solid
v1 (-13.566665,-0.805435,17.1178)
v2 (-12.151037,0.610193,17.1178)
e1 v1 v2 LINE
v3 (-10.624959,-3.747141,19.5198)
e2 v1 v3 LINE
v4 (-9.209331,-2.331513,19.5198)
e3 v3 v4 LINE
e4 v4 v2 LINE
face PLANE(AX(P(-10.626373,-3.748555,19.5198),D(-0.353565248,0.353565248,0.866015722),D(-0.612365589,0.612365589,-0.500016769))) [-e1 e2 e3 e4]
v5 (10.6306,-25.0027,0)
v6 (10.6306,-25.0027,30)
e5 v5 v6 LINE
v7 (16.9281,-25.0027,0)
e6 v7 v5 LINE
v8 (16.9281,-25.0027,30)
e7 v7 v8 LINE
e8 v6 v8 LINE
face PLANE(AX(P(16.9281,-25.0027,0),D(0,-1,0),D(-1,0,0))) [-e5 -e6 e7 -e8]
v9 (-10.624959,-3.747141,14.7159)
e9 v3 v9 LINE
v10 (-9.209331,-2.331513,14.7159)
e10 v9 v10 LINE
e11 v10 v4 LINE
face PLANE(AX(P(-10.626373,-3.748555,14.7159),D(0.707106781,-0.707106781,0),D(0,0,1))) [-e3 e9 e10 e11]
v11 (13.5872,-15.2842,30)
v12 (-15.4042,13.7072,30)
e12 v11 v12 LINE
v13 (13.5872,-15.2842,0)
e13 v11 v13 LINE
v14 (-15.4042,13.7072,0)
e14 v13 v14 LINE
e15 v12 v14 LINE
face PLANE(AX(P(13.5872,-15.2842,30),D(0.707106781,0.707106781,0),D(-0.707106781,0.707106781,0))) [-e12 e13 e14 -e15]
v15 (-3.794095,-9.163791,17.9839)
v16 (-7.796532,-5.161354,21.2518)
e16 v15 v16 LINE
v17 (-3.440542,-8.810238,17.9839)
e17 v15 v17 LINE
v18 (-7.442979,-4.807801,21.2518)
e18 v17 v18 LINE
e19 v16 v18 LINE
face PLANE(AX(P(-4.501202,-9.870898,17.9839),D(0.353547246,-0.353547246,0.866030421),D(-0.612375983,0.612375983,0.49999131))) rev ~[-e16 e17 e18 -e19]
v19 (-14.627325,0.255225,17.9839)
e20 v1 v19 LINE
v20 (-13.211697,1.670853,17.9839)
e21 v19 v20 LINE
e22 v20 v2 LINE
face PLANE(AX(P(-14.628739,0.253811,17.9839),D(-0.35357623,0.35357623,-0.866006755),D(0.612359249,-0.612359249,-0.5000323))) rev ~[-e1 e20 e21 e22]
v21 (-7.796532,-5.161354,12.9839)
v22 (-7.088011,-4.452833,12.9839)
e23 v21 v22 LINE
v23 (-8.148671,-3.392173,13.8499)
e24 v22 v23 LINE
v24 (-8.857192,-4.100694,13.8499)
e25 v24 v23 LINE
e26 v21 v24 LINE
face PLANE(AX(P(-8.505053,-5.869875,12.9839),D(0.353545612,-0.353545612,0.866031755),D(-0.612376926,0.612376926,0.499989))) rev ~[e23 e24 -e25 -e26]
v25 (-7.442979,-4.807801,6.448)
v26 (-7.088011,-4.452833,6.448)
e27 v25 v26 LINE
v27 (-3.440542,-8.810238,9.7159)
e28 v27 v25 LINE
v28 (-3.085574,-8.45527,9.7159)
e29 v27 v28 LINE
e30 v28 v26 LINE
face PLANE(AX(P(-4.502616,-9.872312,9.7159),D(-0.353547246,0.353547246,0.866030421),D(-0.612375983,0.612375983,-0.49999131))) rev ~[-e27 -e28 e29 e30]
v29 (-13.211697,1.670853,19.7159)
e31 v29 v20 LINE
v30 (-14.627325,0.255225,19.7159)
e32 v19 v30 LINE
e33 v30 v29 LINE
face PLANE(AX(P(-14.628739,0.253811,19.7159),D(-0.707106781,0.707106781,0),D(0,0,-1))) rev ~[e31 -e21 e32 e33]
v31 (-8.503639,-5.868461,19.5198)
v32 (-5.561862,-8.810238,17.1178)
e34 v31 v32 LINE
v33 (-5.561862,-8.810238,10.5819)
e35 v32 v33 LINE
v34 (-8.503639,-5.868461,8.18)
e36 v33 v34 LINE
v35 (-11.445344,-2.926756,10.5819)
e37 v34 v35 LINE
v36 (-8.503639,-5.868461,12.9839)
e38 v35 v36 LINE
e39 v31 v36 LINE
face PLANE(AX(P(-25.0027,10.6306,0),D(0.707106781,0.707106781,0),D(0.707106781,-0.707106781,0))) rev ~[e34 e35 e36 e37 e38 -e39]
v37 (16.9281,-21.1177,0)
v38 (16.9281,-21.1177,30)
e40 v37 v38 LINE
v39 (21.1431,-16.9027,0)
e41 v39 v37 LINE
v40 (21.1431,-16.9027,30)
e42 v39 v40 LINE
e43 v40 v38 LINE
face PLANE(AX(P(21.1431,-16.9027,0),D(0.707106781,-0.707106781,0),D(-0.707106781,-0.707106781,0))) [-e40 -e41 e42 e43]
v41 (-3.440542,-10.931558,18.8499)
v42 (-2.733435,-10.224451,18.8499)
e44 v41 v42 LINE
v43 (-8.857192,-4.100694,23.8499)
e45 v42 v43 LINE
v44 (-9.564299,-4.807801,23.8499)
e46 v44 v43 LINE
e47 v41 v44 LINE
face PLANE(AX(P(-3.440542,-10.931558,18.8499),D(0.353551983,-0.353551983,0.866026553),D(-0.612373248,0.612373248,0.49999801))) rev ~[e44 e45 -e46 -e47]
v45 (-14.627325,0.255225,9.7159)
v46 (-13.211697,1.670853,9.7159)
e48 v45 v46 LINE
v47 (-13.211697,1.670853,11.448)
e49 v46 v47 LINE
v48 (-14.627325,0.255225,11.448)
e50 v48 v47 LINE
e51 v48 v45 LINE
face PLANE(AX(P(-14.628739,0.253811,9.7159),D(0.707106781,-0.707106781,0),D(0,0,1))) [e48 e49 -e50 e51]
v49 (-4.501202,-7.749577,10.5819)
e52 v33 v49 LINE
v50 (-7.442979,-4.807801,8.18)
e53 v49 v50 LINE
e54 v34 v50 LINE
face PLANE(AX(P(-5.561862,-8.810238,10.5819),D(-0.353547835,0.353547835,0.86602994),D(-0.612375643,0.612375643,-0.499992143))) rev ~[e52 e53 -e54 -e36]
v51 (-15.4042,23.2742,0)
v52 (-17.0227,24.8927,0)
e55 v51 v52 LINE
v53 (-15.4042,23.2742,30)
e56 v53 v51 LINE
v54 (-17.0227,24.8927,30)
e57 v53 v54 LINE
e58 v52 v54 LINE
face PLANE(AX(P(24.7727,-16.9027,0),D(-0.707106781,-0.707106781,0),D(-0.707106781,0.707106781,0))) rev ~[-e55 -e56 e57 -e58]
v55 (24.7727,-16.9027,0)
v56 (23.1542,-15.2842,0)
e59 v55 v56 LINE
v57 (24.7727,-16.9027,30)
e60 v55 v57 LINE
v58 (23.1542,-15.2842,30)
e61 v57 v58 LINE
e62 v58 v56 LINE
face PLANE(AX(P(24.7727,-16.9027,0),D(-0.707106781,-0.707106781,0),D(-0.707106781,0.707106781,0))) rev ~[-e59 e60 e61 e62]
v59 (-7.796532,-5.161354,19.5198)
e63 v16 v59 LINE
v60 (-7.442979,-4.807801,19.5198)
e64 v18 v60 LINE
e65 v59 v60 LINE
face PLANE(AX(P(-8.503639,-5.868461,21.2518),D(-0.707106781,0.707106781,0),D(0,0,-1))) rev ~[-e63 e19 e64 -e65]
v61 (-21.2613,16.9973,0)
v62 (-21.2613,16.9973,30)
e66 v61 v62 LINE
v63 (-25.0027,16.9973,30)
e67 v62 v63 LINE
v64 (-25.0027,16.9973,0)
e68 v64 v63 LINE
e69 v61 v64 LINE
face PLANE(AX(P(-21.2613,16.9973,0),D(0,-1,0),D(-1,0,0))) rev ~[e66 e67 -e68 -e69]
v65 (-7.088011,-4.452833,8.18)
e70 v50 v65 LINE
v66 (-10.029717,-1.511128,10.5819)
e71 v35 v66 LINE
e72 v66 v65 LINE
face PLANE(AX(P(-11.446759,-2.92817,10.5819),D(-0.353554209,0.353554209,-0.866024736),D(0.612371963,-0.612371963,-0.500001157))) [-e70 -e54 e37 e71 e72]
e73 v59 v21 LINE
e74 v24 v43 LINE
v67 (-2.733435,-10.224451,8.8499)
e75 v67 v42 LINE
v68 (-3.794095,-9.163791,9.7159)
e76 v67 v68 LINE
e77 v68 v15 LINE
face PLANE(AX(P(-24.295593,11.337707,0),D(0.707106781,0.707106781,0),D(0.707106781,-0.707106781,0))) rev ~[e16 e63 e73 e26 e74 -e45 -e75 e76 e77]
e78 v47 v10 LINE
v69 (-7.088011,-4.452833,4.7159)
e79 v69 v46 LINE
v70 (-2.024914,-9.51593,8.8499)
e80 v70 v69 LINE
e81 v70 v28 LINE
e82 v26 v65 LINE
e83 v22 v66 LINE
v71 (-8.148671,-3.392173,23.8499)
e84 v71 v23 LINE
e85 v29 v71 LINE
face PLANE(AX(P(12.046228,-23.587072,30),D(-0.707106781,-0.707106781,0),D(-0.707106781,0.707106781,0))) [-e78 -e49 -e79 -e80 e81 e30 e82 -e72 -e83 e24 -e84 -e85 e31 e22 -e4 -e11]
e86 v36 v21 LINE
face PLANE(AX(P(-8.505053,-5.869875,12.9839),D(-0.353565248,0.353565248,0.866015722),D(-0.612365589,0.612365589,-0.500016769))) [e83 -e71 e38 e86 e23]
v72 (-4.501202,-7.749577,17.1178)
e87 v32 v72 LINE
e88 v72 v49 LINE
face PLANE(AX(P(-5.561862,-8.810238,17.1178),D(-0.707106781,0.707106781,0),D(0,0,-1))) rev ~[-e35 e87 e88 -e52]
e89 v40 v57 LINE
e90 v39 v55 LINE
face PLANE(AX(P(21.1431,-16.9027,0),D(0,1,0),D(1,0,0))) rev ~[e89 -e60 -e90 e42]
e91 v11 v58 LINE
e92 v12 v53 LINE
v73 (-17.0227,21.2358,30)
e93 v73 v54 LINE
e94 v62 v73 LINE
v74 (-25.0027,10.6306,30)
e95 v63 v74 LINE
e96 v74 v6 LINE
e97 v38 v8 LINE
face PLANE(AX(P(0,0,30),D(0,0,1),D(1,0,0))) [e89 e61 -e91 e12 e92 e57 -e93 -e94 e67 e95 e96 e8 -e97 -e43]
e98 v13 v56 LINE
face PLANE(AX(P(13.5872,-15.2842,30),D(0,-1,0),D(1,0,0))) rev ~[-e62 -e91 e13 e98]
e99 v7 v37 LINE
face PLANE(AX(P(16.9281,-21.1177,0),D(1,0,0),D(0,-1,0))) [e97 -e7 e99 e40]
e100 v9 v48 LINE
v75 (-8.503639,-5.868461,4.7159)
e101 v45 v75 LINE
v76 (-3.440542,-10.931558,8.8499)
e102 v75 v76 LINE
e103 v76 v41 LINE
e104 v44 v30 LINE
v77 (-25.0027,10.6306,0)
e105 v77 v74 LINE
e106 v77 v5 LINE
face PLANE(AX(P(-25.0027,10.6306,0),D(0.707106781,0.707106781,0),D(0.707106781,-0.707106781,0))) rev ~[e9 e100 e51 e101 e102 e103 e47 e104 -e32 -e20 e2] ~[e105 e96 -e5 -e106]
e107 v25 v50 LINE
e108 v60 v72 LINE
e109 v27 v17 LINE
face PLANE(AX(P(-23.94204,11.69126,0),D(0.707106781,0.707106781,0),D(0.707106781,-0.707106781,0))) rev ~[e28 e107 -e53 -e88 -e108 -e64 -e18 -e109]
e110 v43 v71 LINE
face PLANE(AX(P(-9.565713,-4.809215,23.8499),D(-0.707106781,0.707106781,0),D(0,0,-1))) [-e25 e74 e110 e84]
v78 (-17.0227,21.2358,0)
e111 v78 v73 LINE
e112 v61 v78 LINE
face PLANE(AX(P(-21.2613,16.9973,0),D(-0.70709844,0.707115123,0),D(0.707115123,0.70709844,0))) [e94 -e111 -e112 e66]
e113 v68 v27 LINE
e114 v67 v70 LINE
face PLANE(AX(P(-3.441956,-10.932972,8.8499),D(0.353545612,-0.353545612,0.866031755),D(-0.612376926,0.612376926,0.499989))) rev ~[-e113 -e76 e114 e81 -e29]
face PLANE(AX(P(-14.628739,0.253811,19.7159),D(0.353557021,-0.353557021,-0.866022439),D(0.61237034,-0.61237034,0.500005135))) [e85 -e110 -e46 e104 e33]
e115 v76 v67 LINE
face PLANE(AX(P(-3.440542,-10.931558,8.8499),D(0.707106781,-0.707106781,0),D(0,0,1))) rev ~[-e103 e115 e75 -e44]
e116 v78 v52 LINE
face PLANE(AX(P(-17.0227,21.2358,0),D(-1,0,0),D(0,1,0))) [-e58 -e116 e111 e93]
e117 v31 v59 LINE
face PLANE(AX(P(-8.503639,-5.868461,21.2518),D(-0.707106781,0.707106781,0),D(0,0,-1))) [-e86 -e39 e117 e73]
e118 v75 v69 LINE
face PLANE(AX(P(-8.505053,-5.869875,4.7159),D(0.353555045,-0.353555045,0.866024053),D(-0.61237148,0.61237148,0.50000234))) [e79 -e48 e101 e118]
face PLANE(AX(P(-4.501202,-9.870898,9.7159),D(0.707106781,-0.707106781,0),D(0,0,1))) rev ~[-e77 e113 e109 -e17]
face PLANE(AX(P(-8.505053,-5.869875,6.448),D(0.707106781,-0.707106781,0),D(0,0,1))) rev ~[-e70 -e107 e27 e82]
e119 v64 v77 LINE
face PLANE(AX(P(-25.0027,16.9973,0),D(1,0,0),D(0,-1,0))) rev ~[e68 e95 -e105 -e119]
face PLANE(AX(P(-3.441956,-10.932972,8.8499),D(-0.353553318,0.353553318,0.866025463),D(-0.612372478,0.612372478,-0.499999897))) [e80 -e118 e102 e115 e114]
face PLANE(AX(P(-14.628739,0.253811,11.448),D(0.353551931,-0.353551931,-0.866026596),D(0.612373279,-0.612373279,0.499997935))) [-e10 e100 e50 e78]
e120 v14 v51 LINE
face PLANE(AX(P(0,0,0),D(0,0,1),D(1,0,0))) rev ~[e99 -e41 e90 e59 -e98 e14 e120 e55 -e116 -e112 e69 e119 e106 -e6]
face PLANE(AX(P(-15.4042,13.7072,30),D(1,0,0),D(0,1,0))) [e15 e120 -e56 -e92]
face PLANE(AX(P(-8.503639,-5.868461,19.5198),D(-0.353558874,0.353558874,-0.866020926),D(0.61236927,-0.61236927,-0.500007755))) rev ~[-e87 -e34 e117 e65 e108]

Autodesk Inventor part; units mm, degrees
ref_plane "YZ Plane" through (0, 0, 0) normal (1, 0, 0) x (0, 1, 0)
ref_plane "XZ Plane" through (0, 0, 0) normal (0, 1, 0) x (-1, 0, 0)
sketch "Sketch1" plane through (0, 0, 0) normal (0, 0, 1) x (1, 0, 0)
  line L0 (21.1431, -16.9027) -> (16.9281, -21.1177)
  line L1 (-21.2613, 16.9973) -> (-17.0227, 21.2358)
  line L2 (-17.0227, 21.2358) -> (16.9281, -21.1177) construction
  line L3 (21.1431, -16.9027) -> (-21.2613, 16.9973) construction
  line L4 (-17.0227, 21.2358) -> (36.8231, 21.2358) construction
  line L5 (16.9281, -21.1177) -> (16.9281, -25.0027)
  line L6 (-17.0227, 21.2358) -> (-17.0227, 24.8927)
  line L7 (21.1431, -16.9027) -> (24.7727, -16.9027)
  line L8 (24.7727, -16.9027) -> (-17.0227, 24.8927)
  line L9 (-25.0027, 16.9973) -> (-25.0027, 10.6306)
  line L10 (16.9281, -25.0027) -> (10.6306, -25.0027)
  line L11 (-25.0027, 10.6306) -> (10.6306, -25.0027)
  line L12 (-25.0027, 16.9973) -> (-7.0741, 16.9973) construction
  line L13 (-17.1227, 21.2773) -> (-21.3027, 17.0973)
  line L14 (16.8927, -21.1827) -> (21.0727, -17.0027)
  line L15 (24.7727, -17.0027) -> (21.1414, -17.0027)
  line L16 (22.7727, -25.0027) -> (-23.0273, -25.0027)
  line L17 (16.8927, -25.0027) -> (16.8927, -21.2526)
  line L18 (-17.1227, 25.0973) -> (-17.1227, 21.3471)
  line L19 (-25.0027, 17.0973) -> (-21.3714, 17.0973)
  line L20 (-21.2613, 16.9973) -> (-25.0027, 16.9973)
  point P0 (0, 0)
  point P1 (16.8927, -21.2526)
extrude "Extrusion1" add sketch "Sketch1" along normal blind 30
ref_plane "Work Plane1" through (16.9, -16.9, -8) normal (-0.7071068, -0.7071068, 0) x (0, 0, 1)
sketch "Sketch7" plane through (0, 0, 30) normal (0, 0, 1) x (1, 0, 0)
  line L0 (21.1431, -16.9027) -> (24.7727, -16.9027) projected
  line L1 (24.7727, -16.9027) -> (-17.0227, 24.8927) projected
  line L2 (-17.0227, 24.8927) -> (-17.0227, 21.2358) projected
  line L3 (-17.0227, 21.2358) -> (-21.2613, 16.9973) projected
  line L4 (-21.2613, 16.9973) -> (-25.0027, 16.9973) projected
  line L5 (-25.0027, 16.9973) -> (-25.0027, 10.6306) projected
  line L6 (-25.0027, 10.6306) -> (10.6306, -25.0027) projected
  line L7 (10.6306, -25.0027) -> (16.9281, -25.0027) projected
  line L8 (16.9281, -25.0027) -> (16.9281, -21.1177) projected
  line L9 (16.9281, -21.1177) -> (21.1431, -16.9027) projected
  line L10 (3.875, 3.995) -> (-7.1861, -7.1861)
  line L11 (-25.0027, 10.6306) -> (10.6306, -25.0027) projected
  line L12 (23.1542, -5.7172) -> (13.5872, -15.2842)
  line L13 (13.5872, -15.2842) -> (-15.4042, 13.7072)
  line L14 (-15.4042, 13.7072) -> (-5.8372, 23.2742)
  line L15 (-5.8372, 23.2742) -> (23.1542, -5.7172)
  line L16 (23.1542, -5.7172) -> (-15.4042, 13.7072) construction
  line L17 (13.5872, -15.2842) -> (-5.8372, 23.2742) construction
  line L18 (-15.4042, 13.7072) -> (-15.4042, 23.2742)
  line L19 (24.7727, -16.9027) -> (-17.0227, 24.8927) projected
  line L20 (13.5872, -15.2842) -> (23.1542, -15.2842)
  point P0 (0, 0)
  dimension "d28" = 41
  dimension "d29" = 1.2
  dimension "d74" = 0
extrude "Extrusion7" cut sketch "Sketch7" against normal through all contours L20 L12 L1 | L12 L13 L10 L1 | L1 L14 L15 L12 | L10 L13 L14 L1 | L14 L18 L1
sketch "Sketch10" plane through (10.6306, -25.0027, 30) normal (-0.7071068, -0.7071068, 0) x (-0.7071068, 0.7071068, 0)
  line L0 (1.6838, 16.5215) -> (7.0744, 19.4702) construction
  line L1 (7.0744, 19.4702) -> (7.0744, 10.5304) construction
  line L2 (7.0744, 10.5304) -> (1.6838, 10.5304) construction
  line L3 (1.6838, 10.5304) -> (1.6838, 6.839) construction
  line L4 (1.6838, 6.839) -> (6.7206, 6.839) construction
  line L5 (6.7206, 6.839) -> (6.7206, 1.2092) construction
  line L6 (6.7206, 1.2092) -> (1.6838, 1.2092) construction
  line L7 (1.6838, 1.2092) -> (1.6838, -3.423) construction
  line L8 (1.6838, -3.423) -> (55.1934, -3.423) construction
  line L9 (1.6838, 30.377) -> (1.6838, 26.2152) construction
  line L10 (1.6838, 26.2152) -> (7.1181, 26.2152) construction
  line L11 (7.1181, 26.2152) -> (7.1181, 20.0634) construction
  line L12 (7.1181, 20.0634) -> (1.6838, 20.0634) construction
  line L13 (1.6838, 20.0634) -> (1.6838, 16.5215) construction
  line L14 (7.0744, 15.0003) -> (55.1934, 14.9149) construction
  line L15 (1.6838, 30.377) -> (36.6838, 30.377) construction
  line L16 (36.6838, -3.423) -> (1.6838, -3.423) construction
  line L17 (19.8996, 21.1501) -> (19.8996, 11.1501)
  line L18 (19.8996, 11.1501) -> (28.5599, 6.1501)
  line L19 (19.8996, 21.1501) -> (21.3996, 20.2841)
  line L20 (21.3996, 20.2841) -> (21.3996, 12.0161)
  line L21 (21.3996, 12.0161) -> (27.0599, 8.7482)
  line L22 (27.0599, 8.7482) -> (27.0599, 17.0161)
  line L23 (27.0599, 17.0161) -> (28.5599, 16.1501)
  line L24 (28.5599, 16.1501) -> (28.5599, 6.1501)
  line L25 (50.3931, 0) -> (0, 0) construction
  line L26 (50.3931, 30) -> (50.3931, 0) construction
  line L27 (50.3931, 15) -> (0, 15) construction
  line L28 (0, 30) -> (0, 0) construction
  point P0 (25.1966, 30)
  point P1 (25.1966, 15)
  dimension "d40" = 1.5
  dimension "d41" = 1.5
  dimension "d42" = 1.5
  dimension "d43" = 10
  dimension "d44" = 10
  dimension "d75" = 8.268
  dimension "d76" = 120
emboss "Emboss1" sketch "Sketch10" operation cut depth 1 direction (0.7071068, 0.7071068, 0)
sketch "Sketch11" plane through (10.6306, -25.0027, 30) normal (-0.7071068, -0.7071068, 0) x (-0.7071068, 0.7071068, 0)
  line L0 (21.3996, 12.0161) -> (27.0599, 8.7482) construction
  line L1 (27.0599, 8.7482) -> (27.0599, 17.0161) construction
  line L2 (27.0599, 17.0161) -> (28.5599, 16.1501) construction
  line L3 (28.5599, 16.1501) -> (28.5599, 6.1501) construction
  line L4 (28.5599, 6.1501) -> (19.8996, 11.1501) construction
  line L5 (19.8996, 11.1501) -> (19.8996, 21.1501) construction
  line L6 (19.8996, 21.1501) -> (21.3996, 20.2841) construction
  line L7 (21.3996, 20.2841) -> (21.3996, 12.0161) construction
  line L8 (50.3931, 30) -> (0, 30) construction
  line L9 (0, 30) -> (0, 0) construction
  line L10 (50.3931, 0) -> (0, 0) construction
  line L11 (50.3931, 30) -> (50.3931, 0) construction
  line L12 (9.2379, 27.3057) -> (21.3996, 20.2841) construction
  line L13 (21.3996, 20.2841) -> (21.3996, 12.0161) construction
  line L14 (21.3996, 12.0161) -> (27.0599, 8.7482) construction
  line L15 (27.0599, 8.7482) -> (27.0599, 7.4216) construction
  line L16 (27.0599, 7.4216) -> (17.8982, 13.0177) construction
  line L17 (17.8982, 13.0177) -> (17.8982, 3.0177) construction
  line L18 (17.8982, 3.0177) -> (9.2379, 8.0177) construction
  line L19 (9.2379, 8.0177) -> (9.2379, 27.3057) construction
  line L20 (15.5651, 18.4016) -> (15.5, -16.9) construction
  line L21 (15.5651, 18.4016) -> (-17.5, 16.9) construction
  line L22 (-17.5, 16.9) -> (-17.5, 12.7382) construction
  line L23 (-17.5, 12.7382) -> (-12.0658, 12.7382) construction
  line L24 (-12.0658, 12.7382) -> (-12.0658, 6.5864) construction
  line L25 (-12.0658, 6.5864) -> (-17.5, 6.5864) construction
  line L26 (-17.5, 6.5864) -> (-17.5, 3.0446) construction
  line L27 (-17.5, 3.0446) -> (-12.1095, 3.0446) construction
  line L28 (-12.1095, 3.0446) -> (-12.1095, -2.9465) construction
  line L29 (-12.1095, -2.9465) -> (-17.5, -2.9465) construction
  line L30 (-17.5, -2.9465) -> (-17.5, -6.638) construction
  line L31 (-17.5, -6.638) -> (-12.4632, -6.638) construction
  line L32 (-12.4632, -6.638) -> (-12.4632, -12.2678) construction
  line L33 (-12.4632, -12.2678) -> (-17.5, -12.2678) construction
  line L34 (-17.5, -12.2678) -> (-17.5, -16.9) construction
  line L35 (-17.5, -16.9) -> (15.5, -16.9) construction
  line L36 (-12.1095, 0.049) -> (15.5326, 0.7508) construction
  line L37 (15.5, -16.9) -> (15.5651, 18.4016) construction
  line L38 (1.91, 17.7815) -> (1.91, -16.9) construction
  line L39 (15.5, -16.9) -> (-17.5, -16.9) construction
  line L40 (27.0599, 8.7482) -> (27.0599, 7.4216) construction
  line L41 (21.3996, 20.2841) -> (21.3996, 12.0161)
  line L42 (21.3996, 12.0161) -> (27.0599, 8.7482)
  line L43 (21.3996, 20.2841) -> (21.3996, 12.0161)
  line L44 (21.3996, 12.0161) -> (27.0599, 8.7482)
  line L45 (27.0599, 8.7482) -> (27.0599, 10.4802)
  line L46 (27.0599, 8.7482) -> (27.0599, 7.4216)
  line L47 (27.0599, 10.4802) -> (22.8996, 12.8822)
  line L48 (22.8996, 12.8822) -> (22.8996, 19.4181)
  line L49 (22.8996, 19.4181) -> (27.0599, 21.82)
  line L50 (21.3996, 20.2841) -> (27.0599, 23.552)
  line L51 (27.0599, 23.552) -> (27.0599, 21.82)
  point P0 (25.1966, 30)
  point P1 (20.9754, 14.9785)
  dimension "d47" = 120
  dimension "d48" = 1.5
  dimension "d49" = 1.5
  dimension "d50" = 1.5
  dimension "d77" = 8.268
  dimension "d78" = 4.1602
  dimension "d79" = 5.6602
  dimension "d80" = 120
  dimension "d81" = 120
emboss "Emboss2" sketch "Sketch11" operation cut depth 1.5 direction (0.7071068, 0.7071068, 0)
sketch "Sketch12" plane through (10.6306, -25.0027, 30) normal (-0.7071068, -0.7071068, 0) x (-0.7071068, 0.7071068, 0)
  line L0 (22.8996, 12.8822) -> (27.0599, 10.4802) construction
  line L1 (27.0599, 10.4802) -> (27.0599, 17.0161) construction
  line L2 (27.0599, 17.0161) -> (28.5599, 16.1501) construction
  line L3 (28.5599, 16.1501) -> (28.5599, 6.1501) construction
  line L4 (28.5599, 6.1501) -> (19.8996, 11.1501) construction
  line L5 (19.8996, 11.1501) -> (19.8996, 21.1501) construction
  line L6 (19.8996, 21.1501) -> (21.3996, 20.2841) construction
  line L7 (21.3996, 20.2841) -> (27.0599, 23.552) construction
  line L8 (27.0599, 23.552) -> (27.0599, 21.82) construction
  line L9 (27.0599, 21.82) -> (22.8996, 19.4181) construction
  line L10 (22.8996, 19.4181) -> (22.8996, 12.8822) construction
  line L11 (50.3931, 30) -> (0, 30) construction
  line L12 (0, 30) -> (0, 0) construction
  line L13 (50.3931, 0) -> (0, 0) construction
  line L14 (50.3931, 30) -> (50.3931, 0) construction
  line L15 (12.7689, 9.4432) -> (16.9291, 7.0413) construction
  line L16 (16.9291, 7.0413) -> (27.0599, 17.0161) construction
  line L17 (27.0599, 17.0161) -> (28.5599, 16.1501) construction
  line L18 (28.5599, 16.1501) -> (28.5599, 6.1501) construction
  line L19 (28.5599, 6.1501) -> (13.0911, 5.9826) construction
  line L20 (13.0911, 5.9826) -> (19.8996, 21.1501) construction
  line L21 (19.8996, 21.1501) -> (21.3996, 20.2841) construction
  line L22 (21.3996, 20.2841) -> (27.0599, 23.552) construction
  line L23 (27.0599, 23.552) -> (27.0599, 21.82) construction
  line L24 (27.0599, 21.82) -> (12.7689, 15.9791) construction
  line L25 (12.7689, 15.9791) -> (12.7689, 9.4432) construction
  line L26 (-17.5, 16.9) -> (-17.5, 12.7382) construction
  line L27 (-17.5, 12.7382) -> (-12.0658, 12.7382) construction
  line L28 (-12.0658, 12.7382) -> (-12.0658, 6.5864) construction
  line L29 (-12.0658, 6.5864) -> (-17.5, 6.5864) construction
  line L30 (-17.5, 6.5864) -> (-17.5, 3.0446) construction
  line L31 (-17.5, 3.0446) -> (-12.1095, 3.0446) construction
  line L32 (-12.1095, 3.0446) -> (-12.1095, -2.9465) construction
  line L33 (-12.1095, -2.9465) -> (-17.5, -2.9465) construction
  line L34 (-17.5, -2.9465) -> (-17.5, -6.638) construction
  line L35 (-17.5, -6.638) -> (-12.4632, -6.638) construction
  line L36 (-12.4632, -6.638) -> (-12.4632, -12.2678) construction
  line L37 (-12.4632, -12.2678) -> (-17.5, -12.2678) construction
  line L38 (-17.5, -12.2678) -> (-17.5, -16.9) construction
  line L39 (-17.5, -16.9) -> (15.5, -16.9) construction
  line L40 (21.3996, 20.2841) -> (27.0599, 23.552)
  line L41 (19.8996, 21.1501) -> (21.3996, 20.2841)
  line L42 (21.3996, 20.2841) -> (27.0599, 23.552)
  line L43 (27.0599, 23.552) -> (27.0599, 21.82)
  line L44 (27.0599, 23.552) -> (27.0599, 21.82)
  line L45 (16.9291, 7.0413) -> (27.0599, 17.0161) construction
  line L46 (19.8996, 21.1501) -> (27.0599, 25.2841)
  line L47 (27.0599, 25.2841) -> (35.7201, 20.2841)
  line L48 (35.7201, 20.2841) -> (35.7201, 18.552)
  line L49 (35.7201, 18.552) -> (30.0599, 15.2841)
  line L50 (30.0599, 15.2841) -> (30.0599, 10.4802)
  line L51 (30.0599, 10.4802) -> (34.2201, 12.8822)
  line L52 (35.7201, 10.2841) -> (35.7201, 10.2841)
  line L53 (35.7201, 10.2841) -> (28.5599, 6.1501)
  line L54 (27.0599, 17.0161) -> (28.5599, 16.1501)
  line L55 (28.5599, 6.1501) -> (28.5599, 16.1501)
  line L56 (28.5599, 16.1501) -> (27.0599, 17.0161)
  line L57 (27.0599, 21.82) -> (27.0599, 23.552)
  line L58 (28.5599, 16.1501) -> (28.5599, 6.1501)
  line L59 (27.0599, 17.0161) -> (31.2201, 19.4181)
  line L60 (31.2201, 19.4181) -> (27.0599, 21.82)
  line L61 (13.0911, 5.9826) -> (28.5599, 6.1501) construction
  line L62 (12.7689, 9.4432) -> (16.9291, 7.0413) construction
  line L63 (12.7689, 9.4432) -> (28.5599, 9.6142) construction
  line L64 (28.5599, 9.6142) -> (29.486, 10.1489) construction
  line L65 (28.5599, 16.1501) -> (35.7201, 20.2841) construction
  line L66 (28.5599, 6.1501) -> (34.2971, 9.4625) construction
  line L67 (31.2201, 19.4181) -> (35.3769, 18.7502) construction
  line L68 (27.0599, 23.552) -> (27.0599, 21.82) construction
  line L69 (35.3769, 18.7502) -> (27.0599, 23.552) construction
  line L70 (35.7201, 10.2841) -> (35.7201, 12.0161)
  line L71 (35.7201, 12.0161) -> (34.2201, 12.8822)
  line L72 (16.3223, 7.4494) -> (20.4826, 5.0475) construction
  line L73 (16.3223, 13.9853) -> (16.3223, 7.4494) construction
  line L74 (20.4826, 16.3872) -> (16.3223, 13.9853) construction
  line L75 (20.4826, 18.1193) -> (20.4826, 16.3872) construction
  line L76 (14.8223, 14.8513) -> (20.4826, 18.1193) construction
  line L77 (14.8223, 15.7065) -> (14.8223, 14.8513) construction
  line L78 (20.4826, 12.5307) -> (14.8223, 15.7065) construction
  line L79 (20.4826, 5.0475) -> (20.4826, 12.5307) construction
  line L80 (20.4826, 12.5307) -> (28.5599, 7.9987) construction
  line L81 (28.5599, 7.9987) -> (33.93, 11.0117) construction
  point P0 (25.1966, 30)
  point P1 (20.9754, 14.9785)
  dimension "d54" = 60
  dimension "d55" = 1.5
  dimension "d57" = 120
  dimension "d58" = 1.5
  dimension "d59" = 120
  dimension "d82" = 3
  dimension "d83" = 3
  dimension "d84" = 3
  dimension "d85" = 1.5
  dimension "d86" = 7.1602
  dimension "d87" = 7.1602
  dimension "d88" = 4.1602
  dimension "d89" = 1.7321
  dimension "d90" = 5.6602
  dimension "d91" = 1.7321
  dimension "d92" = 4.1602
extrude "Extrusion9" cut sketch "Sketch12" against normal blind 2
ref_plane "Arbeitsebene4" through (-16.9409, 16.9409, 0) normal (-0.7071068, -0.7071068, 0) x (0, 0, 1)
ref_plane "Arbeitsebene5" through (-2.1793, -2.1793, 0) normal (-0.7071068, 0.7071068, 0) x (-0.7071068, -0.7071068, 0)
sketch "Skizze15" plane through (-15.4042, 13.7072, 0) normal (0.7071068, 0.7071068, 0) x (-0.7071068, 0.7071068, 0)
  point P0 (-20.5849, 0)
equation "\"d3\" = MirrorThickness1"
equation "\"d41\" = d40"
equation "\"d42\" = d40"
equation "\"d44\" = d43"
equation "\"d48\" = d51"
equation "\"d49\" = d51"
equation "\"d50\" = d51"
equation "\"d55\" = d60"
equation "\"d58\" = d60"
equation "\"MirrorThickness1\" = 30"
equation "\"d51\" = 1.5"
equation "\"d60\" = 1.5"
properties part number "20_Cube_Insert_Mirror_Holder_wLogo_Astromedia_30x40x1_v3"
